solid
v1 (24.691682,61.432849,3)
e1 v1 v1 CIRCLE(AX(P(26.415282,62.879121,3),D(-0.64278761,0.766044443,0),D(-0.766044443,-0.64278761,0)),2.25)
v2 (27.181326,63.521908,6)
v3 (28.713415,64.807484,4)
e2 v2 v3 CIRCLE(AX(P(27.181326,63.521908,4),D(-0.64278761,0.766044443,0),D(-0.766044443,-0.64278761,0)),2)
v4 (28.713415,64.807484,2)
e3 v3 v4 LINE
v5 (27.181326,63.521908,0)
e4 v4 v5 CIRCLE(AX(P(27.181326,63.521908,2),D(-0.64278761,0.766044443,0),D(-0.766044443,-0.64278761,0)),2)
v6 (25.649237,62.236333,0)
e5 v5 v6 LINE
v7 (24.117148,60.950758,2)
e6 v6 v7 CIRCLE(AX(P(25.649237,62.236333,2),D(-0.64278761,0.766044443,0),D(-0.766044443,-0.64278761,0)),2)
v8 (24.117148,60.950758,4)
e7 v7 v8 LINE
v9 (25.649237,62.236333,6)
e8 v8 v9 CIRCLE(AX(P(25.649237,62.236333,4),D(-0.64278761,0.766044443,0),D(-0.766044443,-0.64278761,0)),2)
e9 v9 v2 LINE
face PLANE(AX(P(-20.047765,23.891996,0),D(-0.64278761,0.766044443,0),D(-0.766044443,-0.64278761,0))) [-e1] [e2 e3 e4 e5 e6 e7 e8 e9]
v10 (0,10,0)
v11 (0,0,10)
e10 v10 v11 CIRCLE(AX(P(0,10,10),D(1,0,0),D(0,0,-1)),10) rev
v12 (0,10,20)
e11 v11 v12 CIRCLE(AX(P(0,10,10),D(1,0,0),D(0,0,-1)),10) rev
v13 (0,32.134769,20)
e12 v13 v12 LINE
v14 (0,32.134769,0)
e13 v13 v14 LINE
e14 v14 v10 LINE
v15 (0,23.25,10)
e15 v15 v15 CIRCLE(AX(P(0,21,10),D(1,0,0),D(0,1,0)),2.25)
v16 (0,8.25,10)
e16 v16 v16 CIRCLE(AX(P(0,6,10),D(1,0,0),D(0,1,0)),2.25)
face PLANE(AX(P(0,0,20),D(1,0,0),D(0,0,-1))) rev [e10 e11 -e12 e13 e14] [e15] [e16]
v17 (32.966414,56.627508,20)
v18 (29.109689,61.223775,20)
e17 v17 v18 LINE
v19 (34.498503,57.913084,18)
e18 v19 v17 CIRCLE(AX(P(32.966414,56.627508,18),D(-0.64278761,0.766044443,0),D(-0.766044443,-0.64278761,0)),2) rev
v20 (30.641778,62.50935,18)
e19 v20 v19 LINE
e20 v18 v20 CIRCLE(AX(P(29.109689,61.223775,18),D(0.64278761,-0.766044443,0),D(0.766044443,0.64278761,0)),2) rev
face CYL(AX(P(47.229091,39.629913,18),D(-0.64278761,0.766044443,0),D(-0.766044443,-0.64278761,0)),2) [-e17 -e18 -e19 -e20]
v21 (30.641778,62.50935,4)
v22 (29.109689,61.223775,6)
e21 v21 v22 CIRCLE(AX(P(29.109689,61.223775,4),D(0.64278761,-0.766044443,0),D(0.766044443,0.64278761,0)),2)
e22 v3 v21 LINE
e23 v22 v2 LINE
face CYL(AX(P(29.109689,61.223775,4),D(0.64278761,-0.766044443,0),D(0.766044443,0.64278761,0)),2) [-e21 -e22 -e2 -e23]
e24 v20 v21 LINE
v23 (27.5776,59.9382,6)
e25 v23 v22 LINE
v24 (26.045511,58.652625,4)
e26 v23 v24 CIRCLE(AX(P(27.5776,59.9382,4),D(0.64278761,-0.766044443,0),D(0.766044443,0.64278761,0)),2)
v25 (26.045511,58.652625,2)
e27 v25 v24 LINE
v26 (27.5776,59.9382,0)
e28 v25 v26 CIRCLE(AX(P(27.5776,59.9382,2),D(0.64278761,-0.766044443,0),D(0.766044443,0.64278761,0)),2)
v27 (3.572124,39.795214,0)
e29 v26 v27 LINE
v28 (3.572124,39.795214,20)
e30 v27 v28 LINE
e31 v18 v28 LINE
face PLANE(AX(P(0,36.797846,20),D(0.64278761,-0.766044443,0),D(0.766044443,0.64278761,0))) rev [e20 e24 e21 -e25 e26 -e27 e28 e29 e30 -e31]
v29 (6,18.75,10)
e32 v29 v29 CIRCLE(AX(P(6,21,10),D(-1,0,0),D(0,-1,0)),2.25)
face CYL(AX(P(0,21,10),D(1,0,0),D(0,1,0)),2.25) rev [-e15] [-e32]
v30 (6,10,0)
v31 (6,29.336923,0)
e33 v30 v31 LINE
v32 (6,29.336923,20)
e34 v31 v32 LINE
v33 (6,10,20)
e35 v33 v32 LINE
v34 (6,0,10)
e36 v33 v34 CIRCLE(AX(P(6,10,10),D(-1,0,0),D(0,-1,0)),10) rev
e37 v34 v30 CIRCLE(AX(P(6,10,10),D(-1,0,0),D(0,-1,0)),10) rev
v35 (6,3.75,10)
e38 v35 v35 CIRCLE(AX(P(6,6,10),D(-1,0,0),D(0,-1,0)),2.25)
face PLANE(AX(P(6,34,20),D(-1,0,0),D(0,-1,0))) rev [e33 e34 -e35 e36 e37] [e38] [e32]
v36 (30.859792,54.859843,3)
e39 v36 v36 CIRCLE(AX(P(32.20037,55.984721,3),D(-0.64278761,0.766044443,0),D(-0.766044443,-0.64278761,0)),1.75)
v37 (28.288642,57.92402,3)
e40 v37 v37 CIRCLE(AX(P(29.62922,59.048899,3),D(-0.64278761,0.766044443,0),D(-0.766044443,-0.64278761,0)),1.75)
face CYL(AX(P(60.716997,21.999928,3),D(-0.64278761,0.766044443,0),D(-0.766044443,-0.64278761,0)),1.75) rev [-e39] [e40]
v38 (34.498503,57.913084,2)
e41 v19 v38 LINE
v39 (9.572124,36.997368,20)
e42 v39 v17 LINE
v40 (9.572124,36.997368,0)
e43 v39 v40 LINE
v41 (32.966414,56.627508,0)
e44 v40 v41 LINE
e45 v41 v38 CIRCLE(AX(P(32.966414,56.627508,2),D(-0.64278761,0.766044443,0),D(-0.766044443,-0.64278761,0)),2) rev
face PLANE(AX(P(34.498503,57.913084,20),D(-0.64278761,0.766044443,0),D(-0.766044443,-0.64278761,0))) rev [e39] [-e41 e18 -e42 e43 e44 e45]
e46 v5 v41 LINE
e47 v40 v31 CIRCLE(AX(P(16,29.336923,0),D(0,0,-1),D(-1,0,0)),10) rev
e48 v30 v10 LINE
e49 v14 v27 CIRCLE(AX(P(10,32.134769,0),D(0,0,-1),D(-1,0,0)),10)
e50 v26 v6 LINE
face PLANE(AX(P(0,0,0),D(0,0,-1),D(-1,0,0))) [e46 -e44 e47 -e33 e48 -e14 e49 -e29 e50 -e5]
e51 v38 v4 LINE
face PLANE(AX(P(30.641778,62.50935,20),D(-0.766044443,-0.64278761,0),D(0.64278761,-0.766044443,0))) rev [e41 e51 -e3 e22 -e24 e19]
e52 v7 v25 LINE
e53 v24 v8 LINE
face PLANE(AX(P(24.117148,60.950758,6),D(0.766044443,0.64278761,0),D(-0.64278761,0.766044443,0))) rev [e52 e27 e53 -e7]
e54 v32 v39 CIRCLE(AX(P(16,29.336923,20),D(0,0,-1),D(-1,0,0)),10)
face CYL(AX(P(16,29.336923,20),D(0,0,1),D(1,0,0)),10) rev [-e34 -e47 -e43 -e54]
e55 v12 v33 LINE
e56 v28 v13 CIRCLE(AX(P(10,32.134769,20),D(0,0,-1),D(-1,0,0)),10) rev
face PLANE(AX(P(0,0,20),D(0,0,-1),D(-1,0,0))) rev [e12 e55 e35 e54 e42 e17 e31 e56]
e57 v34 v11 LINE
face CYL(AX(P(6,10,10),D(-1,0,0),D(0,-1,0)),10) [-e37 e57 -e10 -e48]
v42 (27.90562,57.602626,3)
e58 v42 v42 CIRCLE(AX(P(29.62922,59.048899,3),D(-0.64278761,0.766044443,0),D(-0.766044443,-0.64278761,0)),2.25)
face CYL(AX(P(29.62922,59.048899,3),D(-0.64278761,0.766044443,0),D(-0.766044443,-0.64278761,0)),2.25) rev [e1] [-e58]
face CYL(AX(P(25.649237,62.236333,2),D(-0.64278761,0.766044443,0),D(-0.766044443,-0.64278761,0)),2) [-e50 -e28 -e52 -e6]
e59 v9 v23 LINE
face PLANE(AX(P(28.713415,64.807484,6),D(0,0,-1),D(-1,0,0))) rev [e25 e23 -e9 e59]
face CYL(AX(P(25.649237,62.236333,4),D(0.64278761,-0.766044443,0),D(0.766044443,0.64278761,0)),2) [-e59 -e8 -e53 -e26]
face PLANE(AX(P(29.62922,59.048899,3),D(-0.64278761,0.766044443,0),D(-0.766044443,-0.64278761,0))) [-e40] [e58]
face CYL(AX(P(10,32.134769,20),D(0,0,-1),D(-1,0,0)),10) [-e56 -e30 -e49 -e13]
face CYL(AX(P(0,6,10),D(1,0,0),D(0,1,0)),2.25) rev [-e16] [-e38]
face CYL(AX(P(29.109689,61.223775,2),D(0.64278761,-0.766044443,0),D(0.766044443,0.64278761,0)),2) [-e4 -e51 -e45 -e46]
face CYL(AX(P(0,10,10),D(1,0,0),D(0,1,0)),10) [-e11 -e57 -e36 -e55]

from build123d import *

# Parameters (mm, degrees)
BOSS_EXTRU_1_DEPTH           = 20
ENL_V_MAT_EXTRU_1_DEPTH      = 72.5512653594726
ENL_V_MAT_EXTRU_1_DEPTH_BACK = 72.5512653594726
ESQUISSE2_R                  = 2.250000000000001
ESQUISSE2_R_2                = 2.2500000000000027
ESQUISSE3_W                  = 6
ESQUISSE3_H                  = 6
BOSS_EXTRU_2_DEPTH           = 3
ESQUISSE4_R                  = 2.249999999999996
ENL_V_MAT_EXTRU_2_DEPTH      = 5
ENL_V_MAT_EXTRU_3_DEPTH      = 71.97314065505222
ENL_V_MAT_EXTRU_3_DEPTH_BACK = 71.97314065505222
ESQUISSE5_R                  = 1.7499999999999962
CONG_1_R                     = 10
CONG_2_R                     = 2


with BuildPart() as part:
    # Esquisse1 → Boss.-Extru.1 (new body)
    with BuildSketch(Plane.XY):
        Polygon((0, 0), (0, 36.797845948930004), (30.64177772475918, 62.50935033639152), (34.498503382878404, 57.91308367767763), (5.9999999999999964, 34), (6, -9.3e-16), align=None)
    extrude(amount=BOSS_EXTRU_1_DEPTH)

    # Esquisse2 → Enlèv. mat.-Extru.1 (cut, two sides: drawn at the far end of the back side and taken through both)
    with BuildSketch(Plane(origin=(6, 6.1e-16, 0), x_dir=(0, 0, -1), z_dir=(1, 1.2e-16, 0)).offset(-ENL_V_MAT_EXTRU_1_DEPTH_BACK)):
        with Locations(Location((-10, 6.000000000000001, 0), (0, 0, 90))):
            Circle(ESQUISSE2_R)
        with Locations(Location((-10, 21, 0), (0, 0, 90))):
            Circle(ESQUISSE2_R_2)
    extrude(amount=ENL_V_MAT_EXTRU_1_DEPTH + ENL_V_MAT_EXTRU_1_DEPTH_BACK, mode=Mode.SUBTRACT)

    # Esquisse3 → Boss.-Extru.2 (add)
    with BuildSketch(Plane(origin=(-18.11940199232756, 21.59386242001515, 0), x_dir=(0.7660444431189798, 0.6427876096865373, 0), z_dir=(-0.6427876096865373, 0.7660444431189798, 0))):
        with Locations((60.65319943912616, -3)):
            Rectangle(ESQUISSE3_W, ESQUISSE3_H)
    extrude(amount=BOSS_EXTRU_2_DEPTH)

    # Esquisse4 → Enlèv. mat.-Extru.2 (cut)
    with BuildSketch(Plane(origin=(-20.047764821387148, 23.89199574937203, 0), x_dir=(0.7660444431189795, 0.6427876096865378, 0), z_dir=(-0.6427876096865378, 0.7660444431189795, 0))):
        with Locations(Location((60.653199439126226, -3, 0), (0, 0, 180))):
            Circle(ESQUISSE4_R)
    extrude(amount=-ENL_V_MAT_EXTRU_2_DEPTH, mode=Mode.SUBTRACT)

    # Esquisse5 → Enlèv. mat.-Extru.3 (cut, two sides: drawn at the far end of the back side and taken through both)
    with BuildSketch(Plane(origin=(-16.83382677295446, 20.061773533777156, 0), x_dir=(0.7660444431189792, 0.6427876096865379, 0), z_dir=(-0.6427876096865379, 0.7660444431189792, 0)).offset(-ENL_V_MAT_EXTRU_3_DEPTH_BACK)):
        with Locations(Location((60.653199439126226, -3, 0), (0, 0, 180))):
            Circle(ESQUISSE5_R)
    extrude(amount=ENL_V_MAT_EXTRU_3_DEPTH + ENL_V_MAT_EXTRU_3_DEPTH_BACK, mode=Mode.SUBTRACT)

    # Congé1
    cong_1_edges = [part.edges().sort_by_distance(p)[0] for p in [
        (5.9999999999999964, 34, 10),
        (0, 36.797845948930004, 10),
        (3, -4.7e-16, 0),
        (3, -4.7e-16, 20),
    ]]
    fillet(cong_1_edges, radius=CONG_1_R - 0.0001)  # a hair under: the kernel refuses the full size

    # Congé2
    cong_2_edges = [part.edges().sort_by_distance(p)[0] for p in [
        (32.57014055381879, 60.21121700703458, 20),
        (29.67759631022939, 63.658417001069964, 6),
        (25.081329651515517, 59.80169134295074, 0),
        (25.081329651515517, 59.80169134295074, 6.000000000000001),
        (31.60595913928899, 61.360283671713034, 0),
    ]]
    fillet(cong_2_edges, radius=CONG_2_R)


solid = part.part
